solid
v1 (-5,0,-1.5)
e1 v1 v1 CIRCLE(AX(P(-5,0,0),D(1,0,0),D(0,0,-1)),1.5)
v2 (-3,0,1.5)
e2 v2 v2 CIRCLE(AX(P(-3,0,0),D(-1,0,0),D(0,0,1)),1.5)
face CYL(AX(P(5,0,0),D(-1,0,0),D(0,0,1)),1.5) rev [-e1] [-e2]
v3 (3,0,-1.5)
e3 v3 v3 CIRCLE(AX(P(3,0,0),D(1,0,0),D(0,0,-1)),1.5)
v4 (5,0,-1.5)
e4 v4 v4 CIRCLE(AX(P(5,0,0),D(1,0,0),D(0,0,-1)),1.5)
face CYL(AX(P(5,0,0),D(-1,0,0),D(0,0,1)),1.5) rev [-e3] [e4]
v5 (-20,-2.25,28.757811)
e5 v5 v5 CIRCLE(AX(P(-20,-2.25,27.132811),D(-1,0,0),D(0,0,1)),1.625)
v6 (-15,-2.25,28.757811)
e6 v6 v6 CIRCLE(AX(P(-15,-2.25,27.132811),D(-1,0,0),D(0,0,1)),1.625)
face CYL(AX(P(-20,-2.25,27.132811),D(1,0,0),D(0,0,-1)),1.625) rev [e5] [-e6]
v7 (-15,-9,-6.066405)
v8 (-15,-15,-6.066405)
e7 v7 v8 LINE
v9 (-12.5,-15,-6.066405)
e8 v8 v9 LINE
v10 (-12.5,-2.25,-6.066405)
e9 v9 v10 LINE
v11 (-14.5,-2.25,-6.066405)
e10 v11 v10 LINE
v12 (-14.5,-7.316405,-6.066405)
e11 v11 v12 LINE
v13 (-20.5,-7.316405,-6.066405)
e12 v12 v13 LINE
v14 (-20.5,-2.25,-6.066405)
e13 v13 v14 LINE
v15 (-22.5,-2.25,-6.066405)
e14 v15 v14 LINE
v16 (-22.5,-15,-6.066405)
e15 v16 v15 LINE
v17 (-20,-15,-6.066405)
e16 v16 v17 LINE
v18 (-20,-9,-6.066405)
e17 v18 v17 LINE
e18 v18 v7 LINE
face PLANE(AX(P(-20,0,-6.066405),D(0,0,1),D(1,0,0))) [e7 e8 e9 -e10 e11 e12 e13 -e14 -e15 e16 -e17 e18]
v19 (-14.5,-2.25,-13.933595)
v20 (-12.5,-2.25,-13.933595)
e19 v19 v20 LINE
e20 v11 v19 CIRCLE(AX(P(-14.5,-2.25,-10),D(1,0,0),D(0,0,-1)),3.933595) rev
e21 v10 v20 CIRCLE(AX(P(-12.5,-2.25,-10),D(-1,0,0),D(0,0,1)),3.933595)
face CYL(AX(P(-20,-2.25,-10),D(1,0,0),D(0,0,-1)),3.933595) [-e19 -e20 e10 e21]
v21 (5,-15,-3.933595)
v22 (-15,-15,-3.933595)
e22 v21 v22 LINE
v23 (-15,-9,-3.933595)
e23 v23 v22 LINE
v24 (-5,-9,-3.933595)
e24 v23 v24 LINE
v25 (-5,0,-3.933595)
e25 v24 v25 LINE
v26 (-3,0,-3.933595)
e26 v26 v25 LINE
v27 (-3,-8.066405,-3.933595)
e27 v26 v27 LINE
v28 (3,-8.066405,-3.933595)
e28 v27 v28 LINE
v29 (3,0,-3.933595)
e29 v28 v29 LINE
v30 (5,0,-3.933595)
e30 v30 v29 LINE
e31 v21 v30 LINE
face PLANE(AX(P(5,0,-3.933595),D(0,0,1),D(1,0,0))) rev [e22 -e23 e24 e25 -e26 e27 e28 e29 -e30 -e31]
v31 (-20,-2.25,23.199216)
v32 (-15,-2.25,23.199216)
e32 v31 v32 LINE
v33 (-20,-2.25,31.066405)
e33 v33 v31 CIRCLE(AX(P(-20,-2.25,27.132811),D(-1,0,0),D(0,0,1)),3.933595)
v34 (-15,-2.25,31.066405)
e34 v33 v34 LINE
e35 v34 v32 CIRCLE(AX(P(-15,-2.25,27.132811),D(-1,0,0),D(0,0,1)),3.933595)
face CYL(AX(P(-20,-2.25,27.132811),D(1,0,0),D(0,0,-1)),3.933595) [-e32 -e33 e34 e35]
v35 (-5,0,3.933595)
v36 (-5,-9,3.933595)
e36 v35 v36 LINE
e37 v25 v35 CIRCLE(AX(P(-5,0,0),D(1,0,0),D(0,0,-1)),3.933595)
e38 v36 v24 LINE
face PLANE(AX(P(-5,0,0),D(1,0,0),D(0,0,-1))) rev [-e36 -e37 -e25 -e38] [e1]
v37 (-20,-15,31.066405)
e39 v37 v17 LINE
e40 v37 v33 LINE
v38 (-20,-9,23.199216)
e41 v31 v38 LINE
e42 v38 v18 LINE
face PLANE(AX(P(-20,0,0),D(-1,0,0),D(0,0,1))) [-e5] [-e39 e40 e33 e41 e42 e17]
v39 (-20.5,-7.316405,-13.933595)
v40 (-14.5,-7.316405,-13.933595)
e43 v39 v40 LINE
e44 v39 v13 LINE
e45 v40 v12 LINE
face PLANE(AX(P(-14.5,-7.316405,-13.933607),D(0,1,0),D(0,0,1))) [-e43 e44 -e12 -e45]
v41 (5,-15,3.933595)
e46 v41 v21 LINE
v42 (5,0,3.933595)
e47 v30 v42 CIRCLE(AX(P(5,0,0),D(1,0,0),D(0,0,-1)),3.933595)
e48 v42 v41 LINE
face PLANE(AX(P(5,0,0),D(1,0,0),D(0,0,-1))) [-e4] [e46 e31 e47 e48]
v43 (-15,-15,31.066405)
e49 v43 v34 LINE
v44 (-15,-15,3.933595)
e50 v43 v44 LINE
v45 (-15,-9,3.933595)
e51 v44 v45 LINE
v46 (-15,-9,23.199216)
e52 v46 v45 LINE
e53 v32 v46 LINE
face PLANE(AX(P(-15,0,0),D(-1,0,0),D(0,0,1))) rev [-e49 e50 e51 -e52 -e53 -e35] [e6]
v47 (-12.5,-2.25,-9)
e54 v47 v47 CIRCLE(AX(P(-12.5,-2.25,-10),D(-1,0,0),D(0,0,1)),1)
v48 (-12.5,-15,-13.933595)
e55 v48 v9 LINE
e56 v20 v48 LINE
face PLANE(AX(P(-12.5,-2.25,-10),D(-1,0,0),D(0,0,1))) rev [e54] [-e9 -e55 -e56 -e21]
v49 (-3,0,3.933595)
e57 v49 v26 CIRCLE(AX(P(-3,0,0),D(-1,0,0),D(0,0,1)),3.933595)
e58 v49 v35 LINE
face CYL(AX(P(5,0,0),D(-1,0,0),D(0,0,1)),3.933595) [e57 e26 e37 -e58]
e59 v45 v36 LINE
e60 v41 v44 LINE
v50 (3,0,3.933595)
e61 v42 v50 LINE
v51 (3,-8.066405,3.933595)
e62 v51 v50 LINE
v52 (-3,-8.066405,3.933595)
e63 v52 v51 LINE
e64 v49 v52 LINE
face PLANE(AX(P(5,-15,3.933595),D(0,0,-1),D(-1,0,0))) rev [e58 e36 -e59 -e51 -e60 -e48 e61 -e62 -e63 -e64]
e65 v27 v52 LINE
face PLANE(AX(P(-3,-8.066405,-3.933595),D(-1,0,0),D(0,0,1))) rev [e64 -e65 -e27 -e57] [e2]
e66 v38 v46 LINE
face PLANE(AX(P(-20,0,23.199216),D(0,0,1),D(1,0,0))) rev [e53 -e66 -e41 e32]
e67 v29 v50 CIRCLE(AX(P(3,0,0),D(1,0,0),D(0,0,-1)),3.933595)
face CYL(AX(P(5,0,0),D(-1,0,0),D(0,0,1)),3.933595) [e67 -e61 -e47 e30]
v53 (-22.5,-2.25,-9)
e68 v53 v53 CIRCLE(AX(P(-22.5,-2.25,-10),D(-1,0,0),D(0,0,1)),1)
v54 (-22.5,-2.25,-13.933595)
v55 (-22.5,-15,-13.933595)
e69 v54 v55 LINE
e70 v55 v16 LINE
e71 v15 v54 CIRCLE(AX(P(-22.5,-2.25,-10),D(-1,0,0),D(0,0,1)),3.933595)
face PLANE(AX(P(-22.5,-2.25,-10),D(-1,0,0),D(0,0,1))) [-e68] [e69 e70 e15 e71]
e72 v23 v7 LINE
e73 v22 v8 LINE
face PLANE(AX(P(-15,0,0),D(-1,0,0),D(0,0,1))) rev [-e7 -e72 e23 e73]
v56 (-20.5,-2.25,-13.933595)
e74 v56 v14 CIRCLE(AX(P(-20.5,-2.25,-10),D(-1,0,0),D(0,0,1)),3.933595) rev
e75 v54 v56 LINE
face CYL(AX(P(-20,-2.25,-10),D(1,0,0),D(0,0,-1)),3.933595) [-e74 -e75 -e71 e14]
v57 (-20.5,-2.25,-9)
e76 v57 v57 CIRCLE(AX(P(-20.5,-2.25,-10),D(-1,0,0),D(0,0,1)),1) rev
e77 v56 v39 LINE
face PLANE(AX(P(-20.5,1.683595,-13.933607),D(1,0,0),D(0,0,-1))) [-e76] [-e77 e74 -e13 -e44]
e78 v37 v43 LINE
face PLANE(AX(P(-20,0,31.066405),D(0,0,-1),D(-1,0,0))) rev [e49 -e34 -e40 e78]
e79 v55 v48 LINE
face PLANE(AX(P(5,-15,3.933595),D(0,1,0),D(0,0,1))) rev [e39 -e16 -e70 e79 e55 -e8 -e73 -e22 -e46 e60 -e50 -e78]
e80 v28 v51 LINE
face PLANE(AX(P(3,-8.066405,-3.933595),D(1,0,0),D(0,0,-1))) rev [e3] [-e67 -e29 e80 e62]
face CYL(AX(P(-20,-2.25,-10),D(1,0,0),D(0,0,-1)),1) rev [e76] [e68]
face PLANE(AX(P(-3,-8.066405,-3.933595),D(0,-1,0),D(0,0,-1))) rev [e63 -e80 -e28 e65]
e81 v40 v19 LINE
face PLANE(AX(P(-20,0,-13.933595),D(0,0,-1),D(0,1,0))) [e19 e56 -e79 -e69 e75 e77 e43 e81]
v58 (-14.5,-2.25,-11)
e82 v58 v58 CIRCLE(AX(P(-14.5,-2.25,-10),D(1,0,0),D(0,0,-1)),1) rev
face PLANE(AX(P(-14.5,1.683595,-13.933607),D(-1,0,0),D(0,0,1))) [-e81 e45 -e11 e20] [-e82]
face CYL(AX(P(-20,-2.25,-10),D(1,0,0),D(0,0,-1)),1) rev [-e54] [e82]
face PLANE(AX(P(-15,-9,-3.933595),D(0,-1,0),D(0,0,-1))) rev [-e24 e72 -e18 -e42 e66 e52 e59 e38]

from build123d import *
from build123d.topology import SkipClean

# Parameters (mm, degrees)
SKETCH1_R                      = 1.5
BOSS_EXTRUDE1_DEPTH            = 5
CUT_EXTRUDE1_DEPTH             = 17.293347298
CUT_EXTRUDE1_DEPTH_BACK        = 17.293347298
SKETCH2_W                      = 6
SKETCH2_H                      = 12
SKETCH5_W                      = 7.867189124
SKETCH5_H                      = 6
BOSS_EXTRUDE2_DEPTH            = 10
SKETCH6_R                      = 1
SKETCH6_R_2                    = 1.625
BOSS_EXTRUDE3_DEPTH            = 5
BOSS_EXTRUDE4_DEPTH            = 2.5
BOSS_EXTRUDE4_DEPTH_BACK       = 7.5
SKETCH7_R                      = 1
CUT_EXTRUDE2_REACH             = 54.5
SKETCH8_W                      = 6
SKETCH8_H                      = 9
CUT_EXTRUDE2_DIRECTION_2_DEPTH = 53.5


with BuildPart() as part:
    # Sketch1 → Boss-Extrude1 (new, symmetric)
    with BuildSketch(Plane(origin=(0, 0, 0), x_dir=(0, 0, -1), z_dir=(1, 0, 0))):
        with BuildLine():
            Line((3.933594562, 0), (3.933594562, -15))
            Line((3.933594562, -15), (-3.933594562, -15))
            Line((-3.933594562, -15), (-3.933594562, 0))
            ThreePointArc((-3.933594562, 0), (0, 3.933594562), (3.933594562, 0))
        make_face()
        Circle(SKETCH1_R, mode=Mode.SUBTRACT)
    extrude(amount=BOSS_EXTRUDE1_DEPTH, both=True)

    # Sketch2 → Cut-Extrude1 (cut, two sides: drawn at the far end of the back side and taken through both)
    with BuildSketch(Plane.XY.offset(-CUT_EXTRUDE1_DEPTH_BACK)):
        with Locations((0, -2.066405438)):
            Rectangle(SKETCH2_W, SKETCH2_H)
    extrude(amount=CUT_EXTRUDE1_DEPTH + CUT_EXTRUDE1_DEPTH_BACK, mode=Mode.SUBTRACT)

    # Sketch5 → Boss-Extrude2 (add)
    with BuildSketch(Plane.ZY.offset(5)):
        with Locations((0, -12)):
            Rectangle(SKETCH5_W, SKETCH5_H)
    extrude(amount=BOSS_EXTRUDE2_DEPTH)

    # Sketch6 → Boss-Extrude3 (add)
    with BuildSketch(Plane.ZY.offset(15)):
        with BuildLine():
            Line((23.199216315, -9), (-6.066405438, -9))
            Line((-6.066405438, -9), (-6.066405438, -2.25))
            ThreePointArc((-6.066405438, -2.25), (-10, 1.683594562), (-13.933594562, -2.25))
            Line((-13.933594562, -2.25), (-13.933594562, -6.757725184))
            Line((-13.933594562, -6.757725184), (-13.933594562, -15))
            Line((-13.933594562, -15), (31.066405438, -15))
            Line((31.066405438, -15), (31.066405438, -6.757725184))
            Line((31.066405438, -6.757725184), (31.066405438, -2.25))
            ThreePointArc((31.066405438, -2.25), (27.132810876, 1.683594562), (23.199216315, -2.25))
            Line((23.199216315, -2.25), (23.199216315, -9))
        make_face()
        with Locations((-10, -2.25)):
            Circle(SKETCH6_R, mode=Mode.SUBTRACT)
        with Locations((27.132810876, -2.25)):
            Circle(SKETCH6_R_2, mode=Mode.SUBTRACT)
    extrude(amount=BOSS_EXTRUDE3_DEPTH)

    # Sketch7 → Boss-Extrude4 (add, two sides: drawn at the far end of the back side and taken through both)
    with SkipClean():  # the faces are left unmerged after this step: merging them gives an invalid solid
        with BuildSketch(Plane.ZY.offset(20).offset(-BOSS_EXTRUDE4_DEPTH_BACK)):
            with BuildLine():
                Line((-13.933594562, -15), (-13.933594562, -2.25))
                ThreePointArc((-13.933594562, -2.25), (-10, 1.683594562), (-6.066405438, -2.25))
                Line((-6.066405438, -2.25), (-6.066405438, -15))
                Line((-6.066405438, -15), (-13.933594562, -15))
            make_face()
            with Locations((-10, -2.25)):
                Circle(SKETCH7_R, mode=Mode.SUBTRACT)
        extrude(amount=BOSS_EXTRUDE4_DEPTH + BOSS_EXTRUDE4_DEPTH_BACK)
    add(part.part.scale(1), mode=Mode.REPLACE)  # the faces are merged on a copy

    # Sketch8 → Cut-Extrude2 (cut, up to next)
    with BuildSketch(Plane(origin=(0, 0, -13.933594562), x_dir=(-1, 0, 0), z_dir=(0, 0, -1)), mode=Mode.PRIVATE) as cut_extrude2_sk1:
        with Locations((17.5, -2.816405438)):
            Rectangle(SKETCH8_W, SKETCH8_H)
    cut_extrude2_tool1 = extrude(cut_extrude2_sk1.sketch, amount=-CUT_EXTRUDE2_REACH, mode=Mode.PRIVATE) & part.part
    add(cut_extrude2_tool1.solids().sort_by_distance((-17.5, -2.816405, -13.933595))[0], mode=Mode.SUBTRACT)

    # Sketch8 → Cut-Extrude2 direction 2 (cut)
    with BuildSketch(Plane(origin=(0, 0, -13.933594562), x_dir=(-1, 0, 0), z_dir=(0, 0, -1))):
        with Locations((17.5, -2.816405438)):
            Rectangle(SKETCH8_W, SKETCH8_H)
    extrude(amount=CUT_EXTRUDE2_DIRECTION_2_DEPTH, mode=Mode.SUBTRACT)


solid = part.part
